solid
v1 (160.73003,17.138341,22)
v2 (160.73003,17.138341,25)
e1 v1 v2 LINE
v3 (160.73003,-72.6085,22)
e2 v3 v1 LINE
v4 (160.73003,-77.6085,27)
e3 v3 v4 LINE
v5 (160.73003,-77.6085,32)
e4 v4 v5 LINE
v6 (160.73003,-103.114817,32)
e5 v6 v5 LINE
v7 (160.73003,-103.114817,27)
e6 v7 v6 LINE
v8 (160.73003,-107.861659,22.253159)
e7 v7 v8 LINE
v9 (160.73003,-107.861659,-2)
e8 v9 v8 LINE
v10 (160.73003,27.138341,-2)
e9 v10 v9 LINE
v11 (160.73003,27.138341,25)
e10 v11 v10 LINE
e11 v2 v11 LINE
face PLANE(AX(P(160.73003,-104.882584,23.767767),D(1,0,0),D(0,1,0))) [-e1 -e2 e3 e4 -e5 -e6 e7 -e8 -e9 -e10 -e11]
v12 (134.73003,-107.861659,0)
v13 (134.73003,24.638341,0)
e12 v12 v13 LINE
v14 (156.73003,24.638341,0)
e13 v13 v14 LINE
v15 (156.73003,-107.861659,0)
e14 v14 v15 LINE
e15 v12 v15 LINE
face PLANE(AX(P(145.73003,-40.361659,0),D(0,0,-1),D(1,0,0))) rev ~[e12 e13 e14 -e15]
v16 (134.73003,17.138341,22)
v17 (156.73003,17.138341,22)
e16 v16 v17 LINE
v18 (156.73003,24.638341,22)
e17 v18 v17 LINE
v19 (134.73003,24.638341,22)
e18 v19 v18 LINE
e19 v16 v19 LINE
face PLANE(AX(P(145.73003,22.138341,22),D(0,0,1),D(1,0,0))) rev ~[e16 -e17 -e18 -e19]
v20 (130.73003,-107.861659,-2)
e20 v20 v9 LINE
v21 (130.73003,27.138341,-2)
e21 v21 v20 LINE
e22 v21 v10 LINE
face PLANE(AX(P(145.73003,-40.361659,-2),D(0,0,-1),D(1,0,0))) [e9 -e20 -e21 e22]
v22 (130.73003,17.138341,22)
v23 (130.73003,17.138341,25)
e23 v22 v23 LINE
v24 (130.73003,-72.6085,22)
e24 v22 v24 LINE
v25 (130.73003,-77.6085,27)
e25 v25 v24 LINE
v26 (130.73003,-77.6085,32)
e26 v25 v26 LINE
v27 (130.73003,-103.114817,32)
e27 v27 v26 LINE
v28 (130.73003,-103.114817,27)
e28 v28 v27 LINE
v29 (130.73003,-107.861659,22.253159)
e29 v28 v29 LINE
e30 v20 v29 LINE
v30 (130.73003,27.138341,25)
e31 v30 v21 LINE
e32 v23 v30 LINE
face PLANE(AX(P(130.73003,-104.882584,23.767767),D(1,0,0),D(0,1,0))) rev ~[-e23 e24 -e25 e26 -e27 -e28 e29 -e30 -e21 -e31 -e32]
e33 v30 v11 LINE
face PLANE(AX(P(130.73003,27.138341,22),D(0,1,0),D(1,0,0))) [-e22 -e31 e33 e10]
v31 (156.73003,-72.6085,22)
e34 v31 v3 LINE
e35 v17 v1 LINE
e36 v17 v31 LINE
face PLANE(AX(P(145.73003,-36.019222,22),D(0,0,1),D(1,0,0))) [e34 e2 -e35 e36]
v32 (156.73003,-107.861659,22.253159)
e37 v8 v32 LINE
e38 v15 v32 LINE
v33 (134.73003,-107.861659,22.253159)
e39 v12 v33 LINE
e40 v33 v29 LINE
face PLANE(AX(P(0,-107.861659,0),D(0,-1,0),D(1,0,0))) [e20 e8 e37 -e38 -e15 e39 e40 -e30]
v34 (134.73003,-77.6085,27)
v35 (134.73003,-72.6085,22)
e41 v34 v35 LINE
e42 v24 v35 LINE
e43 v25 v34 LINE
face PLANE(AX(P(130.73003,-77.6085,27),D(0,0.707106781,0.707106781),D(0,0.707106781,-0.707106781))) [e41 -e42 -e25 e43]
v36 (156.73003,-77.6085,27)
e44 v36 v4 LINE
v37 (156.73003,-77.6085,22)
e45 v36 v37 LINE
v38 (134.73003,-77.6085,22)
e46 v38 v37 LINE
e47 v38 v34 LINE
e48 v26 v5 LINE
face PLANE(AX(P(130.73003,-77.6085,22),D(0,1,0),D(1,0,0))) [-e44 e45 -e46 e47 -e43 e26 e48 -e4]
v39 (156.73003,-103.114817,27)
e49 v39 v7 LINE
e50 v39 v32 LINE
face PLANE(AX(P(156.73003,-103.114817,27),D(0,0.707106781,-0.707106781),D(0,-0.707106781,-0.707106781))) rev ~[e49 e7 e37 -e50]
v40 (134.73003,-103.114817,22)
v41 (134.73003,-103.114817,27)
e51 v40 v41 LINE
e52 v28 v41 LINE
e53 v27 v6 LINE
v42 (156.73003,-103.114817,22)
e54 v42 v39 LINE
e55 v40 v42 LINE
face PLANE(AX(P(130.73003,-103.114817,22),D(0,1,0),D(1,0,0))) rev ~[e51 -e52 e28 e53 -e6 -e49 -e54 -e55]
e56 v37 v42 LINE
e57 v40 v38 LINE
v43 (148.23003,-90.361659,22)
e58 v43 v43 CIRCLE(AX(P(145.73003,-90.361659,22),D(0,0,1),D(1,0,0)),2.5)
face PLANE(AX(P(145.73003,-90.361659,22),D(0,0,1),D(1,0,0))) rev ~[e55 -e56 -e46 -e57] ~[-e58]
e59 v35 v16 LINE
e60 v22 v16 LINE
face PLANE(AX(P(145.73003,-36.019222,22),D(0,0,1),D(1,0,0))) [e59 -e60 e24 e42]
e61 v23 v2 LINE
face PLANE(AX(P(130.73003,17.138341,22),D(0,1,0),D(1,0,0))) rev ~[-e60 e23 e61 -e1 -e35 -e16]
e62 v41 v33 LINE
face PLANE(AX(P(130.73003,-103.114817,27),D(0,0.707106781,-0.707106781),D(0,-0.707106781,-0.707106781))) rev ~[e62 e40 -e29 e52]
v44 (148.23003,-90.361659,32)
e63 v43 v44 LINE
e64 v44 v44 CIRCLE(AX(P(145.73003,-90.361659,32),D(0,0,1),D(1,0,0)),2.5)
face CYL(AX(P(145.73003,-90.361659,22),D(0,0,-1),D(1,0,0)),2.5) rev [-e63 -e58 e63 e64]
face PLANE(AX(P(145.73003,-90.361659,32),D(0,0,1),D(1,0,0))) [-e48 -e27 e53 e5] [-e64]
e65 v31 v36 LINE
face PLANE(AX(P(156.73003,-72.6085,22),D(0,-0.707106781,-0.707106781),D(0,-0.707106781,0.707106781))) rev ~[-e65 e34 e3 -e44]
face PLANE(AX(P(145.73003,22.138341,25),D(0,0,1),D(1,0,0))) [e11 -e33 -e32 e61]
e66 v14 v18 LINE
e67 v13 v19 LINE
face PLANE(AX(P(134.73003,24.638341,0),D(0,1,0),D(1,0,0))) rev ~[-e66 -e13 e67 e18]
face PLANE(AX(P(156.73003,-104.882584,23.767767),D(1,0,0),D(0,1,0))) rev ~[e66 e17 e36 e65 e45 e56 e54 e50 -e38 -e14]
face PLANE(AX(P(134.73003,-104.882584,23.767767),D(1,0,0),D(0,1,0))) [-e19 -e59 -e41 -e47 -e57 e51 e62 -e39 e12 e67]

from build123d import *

# Parameters (mm, degrees)
F1_DEPTH     = 22
F2_W         = 30
F2_H         = 135
F3_DEPTH     = 2
F4_W         = 30
F4_H         = 25.5063175828
F4_R         = 2.5
F5_DEPTH     = 10
F6_W         = 30
F6_H         = 10
F7_DEPTH     = 3
F8_T1_DEPTH  = 4
F8_T3_DEPTH  = 4
F8_T8_DEPTH  = 4
F8_T13_DEPTH = 4


# Not quite as in the source:
# - a fillet or chamfer that OpenCascade refuses, or shapes differently, is made with other operations: its cross-section is extruded or revolved along the edge and cut away or added


with BuildPart() as f1:
    # F0 (on Top) → F1 (new body)
    with BuildSketch(Plane.XY):
        Polygon((160.7300297916, 27.1383413836), (130.7300297916, 27.1383413836), (130.7300297916, -107.8616586164), (134.7300297916, -107.8616586164), (134.7300297916, -105.3616586164), (134.7300297916, 24.6383413836), (156.7300297916, 24.6383413836), (156.7300297916, -105.3616586164), (156.7300297916, -107.8616586164), (160.7300297916, -107.8616586164), align=None)
    extrude(amount=F1_DEPTH)

    # F2 (on face) → F3 (join)
    with BuildSketch(Plane(origin=(0, 0, 0), x_dir=(1, 0, 0), z_dir=(0, 0, -1))):
        with Locations((145.7300297916, 40.3616586164)):
            Rectangle(F2_W, F2_H)
    extrude(amount=F3_DEPTH)

    # F4 (on face) → F5 (join)
    with BuildSketch(Plane.XY.offset(22)):
        with Locations((145.7300297916, -90.3616586164)):
            Rectangle(F4_W, F4_H)
        with Locations((145.7300297916, -90.3616586164)):
            Circle(F4_R, mode=Mode.SUBTRACT)
    extrude(amount=F5_DEPTH)

    # F6 (on face) → F7 (join)
    with BuildSketch(Plane.XY.offset(22)):
        with Locations((145.7300297916, 22.1383413836)):
            Rectangle(F6_W, F6_H)
    extrude(amount=F7_DEPTH)

    # F8: chamfer of 5 on 4 edges, made by hand

    # F8_s2 → F8_t1 (join)
    with BuildSketch(Plane.YZ.offset(156.7300297916)):
        Polygon((-72.608499825, 22), (-77.608499825, 27), (-77.608499825, 22), align=None)
    extrude(amount=F8_T1_DEPTH)

    # F8_s4 → F8_t3 (join)
    with BuildSketch(Plane.YZ.offset(130.7300297916)):
        Polygon((-77.608499825, 27), (-72.608499825, 22), (-77.608499825, 22), align=None)
    extrude(amount=F8_T3_DEPTH)


with BuildPart() as f8_tool6:
    # F8_s7 → F8_t8 (new body)
    with BuildSketch(Plane.YZ.offset(130.7300297916)):
        Polygon((-103.1148174078, 27), (-108.1148174078, 22), (-103.1148174078, 22), align=None)
    extrude(amount=F8_T8_DEPTH)

    split(bisect_by=Plane.XZ.offset(107.8616586164), keep=Keep.BOTTOM)


with BuildPart() as f1_1:
    add(f1.part)

    # F8_t5: union F8_tool6
    add(f8_tool6.part)


with BuildPart() as f8_tool11:
    # F8_s12 → F8_t13 (new body)
    with BuildSketch(Plane.YZ.offset(156.7300297916)):
        Polygon((-103.1148174078, 27), (-108.1148174078, 22), (-103.1148174078, 22), align=None)
    extrude(amount=F8_T13_DEPTH)

    split(bisect_by=Plane.XZ.offset(107.8616586164), keep=Keep.BOTTOM)


with BuildPart() as f1_2:
    add(f1_1.part)

    # F8_t10: union F8_tool11
    add(f8_tool11.part)


solid = f1_2.part
